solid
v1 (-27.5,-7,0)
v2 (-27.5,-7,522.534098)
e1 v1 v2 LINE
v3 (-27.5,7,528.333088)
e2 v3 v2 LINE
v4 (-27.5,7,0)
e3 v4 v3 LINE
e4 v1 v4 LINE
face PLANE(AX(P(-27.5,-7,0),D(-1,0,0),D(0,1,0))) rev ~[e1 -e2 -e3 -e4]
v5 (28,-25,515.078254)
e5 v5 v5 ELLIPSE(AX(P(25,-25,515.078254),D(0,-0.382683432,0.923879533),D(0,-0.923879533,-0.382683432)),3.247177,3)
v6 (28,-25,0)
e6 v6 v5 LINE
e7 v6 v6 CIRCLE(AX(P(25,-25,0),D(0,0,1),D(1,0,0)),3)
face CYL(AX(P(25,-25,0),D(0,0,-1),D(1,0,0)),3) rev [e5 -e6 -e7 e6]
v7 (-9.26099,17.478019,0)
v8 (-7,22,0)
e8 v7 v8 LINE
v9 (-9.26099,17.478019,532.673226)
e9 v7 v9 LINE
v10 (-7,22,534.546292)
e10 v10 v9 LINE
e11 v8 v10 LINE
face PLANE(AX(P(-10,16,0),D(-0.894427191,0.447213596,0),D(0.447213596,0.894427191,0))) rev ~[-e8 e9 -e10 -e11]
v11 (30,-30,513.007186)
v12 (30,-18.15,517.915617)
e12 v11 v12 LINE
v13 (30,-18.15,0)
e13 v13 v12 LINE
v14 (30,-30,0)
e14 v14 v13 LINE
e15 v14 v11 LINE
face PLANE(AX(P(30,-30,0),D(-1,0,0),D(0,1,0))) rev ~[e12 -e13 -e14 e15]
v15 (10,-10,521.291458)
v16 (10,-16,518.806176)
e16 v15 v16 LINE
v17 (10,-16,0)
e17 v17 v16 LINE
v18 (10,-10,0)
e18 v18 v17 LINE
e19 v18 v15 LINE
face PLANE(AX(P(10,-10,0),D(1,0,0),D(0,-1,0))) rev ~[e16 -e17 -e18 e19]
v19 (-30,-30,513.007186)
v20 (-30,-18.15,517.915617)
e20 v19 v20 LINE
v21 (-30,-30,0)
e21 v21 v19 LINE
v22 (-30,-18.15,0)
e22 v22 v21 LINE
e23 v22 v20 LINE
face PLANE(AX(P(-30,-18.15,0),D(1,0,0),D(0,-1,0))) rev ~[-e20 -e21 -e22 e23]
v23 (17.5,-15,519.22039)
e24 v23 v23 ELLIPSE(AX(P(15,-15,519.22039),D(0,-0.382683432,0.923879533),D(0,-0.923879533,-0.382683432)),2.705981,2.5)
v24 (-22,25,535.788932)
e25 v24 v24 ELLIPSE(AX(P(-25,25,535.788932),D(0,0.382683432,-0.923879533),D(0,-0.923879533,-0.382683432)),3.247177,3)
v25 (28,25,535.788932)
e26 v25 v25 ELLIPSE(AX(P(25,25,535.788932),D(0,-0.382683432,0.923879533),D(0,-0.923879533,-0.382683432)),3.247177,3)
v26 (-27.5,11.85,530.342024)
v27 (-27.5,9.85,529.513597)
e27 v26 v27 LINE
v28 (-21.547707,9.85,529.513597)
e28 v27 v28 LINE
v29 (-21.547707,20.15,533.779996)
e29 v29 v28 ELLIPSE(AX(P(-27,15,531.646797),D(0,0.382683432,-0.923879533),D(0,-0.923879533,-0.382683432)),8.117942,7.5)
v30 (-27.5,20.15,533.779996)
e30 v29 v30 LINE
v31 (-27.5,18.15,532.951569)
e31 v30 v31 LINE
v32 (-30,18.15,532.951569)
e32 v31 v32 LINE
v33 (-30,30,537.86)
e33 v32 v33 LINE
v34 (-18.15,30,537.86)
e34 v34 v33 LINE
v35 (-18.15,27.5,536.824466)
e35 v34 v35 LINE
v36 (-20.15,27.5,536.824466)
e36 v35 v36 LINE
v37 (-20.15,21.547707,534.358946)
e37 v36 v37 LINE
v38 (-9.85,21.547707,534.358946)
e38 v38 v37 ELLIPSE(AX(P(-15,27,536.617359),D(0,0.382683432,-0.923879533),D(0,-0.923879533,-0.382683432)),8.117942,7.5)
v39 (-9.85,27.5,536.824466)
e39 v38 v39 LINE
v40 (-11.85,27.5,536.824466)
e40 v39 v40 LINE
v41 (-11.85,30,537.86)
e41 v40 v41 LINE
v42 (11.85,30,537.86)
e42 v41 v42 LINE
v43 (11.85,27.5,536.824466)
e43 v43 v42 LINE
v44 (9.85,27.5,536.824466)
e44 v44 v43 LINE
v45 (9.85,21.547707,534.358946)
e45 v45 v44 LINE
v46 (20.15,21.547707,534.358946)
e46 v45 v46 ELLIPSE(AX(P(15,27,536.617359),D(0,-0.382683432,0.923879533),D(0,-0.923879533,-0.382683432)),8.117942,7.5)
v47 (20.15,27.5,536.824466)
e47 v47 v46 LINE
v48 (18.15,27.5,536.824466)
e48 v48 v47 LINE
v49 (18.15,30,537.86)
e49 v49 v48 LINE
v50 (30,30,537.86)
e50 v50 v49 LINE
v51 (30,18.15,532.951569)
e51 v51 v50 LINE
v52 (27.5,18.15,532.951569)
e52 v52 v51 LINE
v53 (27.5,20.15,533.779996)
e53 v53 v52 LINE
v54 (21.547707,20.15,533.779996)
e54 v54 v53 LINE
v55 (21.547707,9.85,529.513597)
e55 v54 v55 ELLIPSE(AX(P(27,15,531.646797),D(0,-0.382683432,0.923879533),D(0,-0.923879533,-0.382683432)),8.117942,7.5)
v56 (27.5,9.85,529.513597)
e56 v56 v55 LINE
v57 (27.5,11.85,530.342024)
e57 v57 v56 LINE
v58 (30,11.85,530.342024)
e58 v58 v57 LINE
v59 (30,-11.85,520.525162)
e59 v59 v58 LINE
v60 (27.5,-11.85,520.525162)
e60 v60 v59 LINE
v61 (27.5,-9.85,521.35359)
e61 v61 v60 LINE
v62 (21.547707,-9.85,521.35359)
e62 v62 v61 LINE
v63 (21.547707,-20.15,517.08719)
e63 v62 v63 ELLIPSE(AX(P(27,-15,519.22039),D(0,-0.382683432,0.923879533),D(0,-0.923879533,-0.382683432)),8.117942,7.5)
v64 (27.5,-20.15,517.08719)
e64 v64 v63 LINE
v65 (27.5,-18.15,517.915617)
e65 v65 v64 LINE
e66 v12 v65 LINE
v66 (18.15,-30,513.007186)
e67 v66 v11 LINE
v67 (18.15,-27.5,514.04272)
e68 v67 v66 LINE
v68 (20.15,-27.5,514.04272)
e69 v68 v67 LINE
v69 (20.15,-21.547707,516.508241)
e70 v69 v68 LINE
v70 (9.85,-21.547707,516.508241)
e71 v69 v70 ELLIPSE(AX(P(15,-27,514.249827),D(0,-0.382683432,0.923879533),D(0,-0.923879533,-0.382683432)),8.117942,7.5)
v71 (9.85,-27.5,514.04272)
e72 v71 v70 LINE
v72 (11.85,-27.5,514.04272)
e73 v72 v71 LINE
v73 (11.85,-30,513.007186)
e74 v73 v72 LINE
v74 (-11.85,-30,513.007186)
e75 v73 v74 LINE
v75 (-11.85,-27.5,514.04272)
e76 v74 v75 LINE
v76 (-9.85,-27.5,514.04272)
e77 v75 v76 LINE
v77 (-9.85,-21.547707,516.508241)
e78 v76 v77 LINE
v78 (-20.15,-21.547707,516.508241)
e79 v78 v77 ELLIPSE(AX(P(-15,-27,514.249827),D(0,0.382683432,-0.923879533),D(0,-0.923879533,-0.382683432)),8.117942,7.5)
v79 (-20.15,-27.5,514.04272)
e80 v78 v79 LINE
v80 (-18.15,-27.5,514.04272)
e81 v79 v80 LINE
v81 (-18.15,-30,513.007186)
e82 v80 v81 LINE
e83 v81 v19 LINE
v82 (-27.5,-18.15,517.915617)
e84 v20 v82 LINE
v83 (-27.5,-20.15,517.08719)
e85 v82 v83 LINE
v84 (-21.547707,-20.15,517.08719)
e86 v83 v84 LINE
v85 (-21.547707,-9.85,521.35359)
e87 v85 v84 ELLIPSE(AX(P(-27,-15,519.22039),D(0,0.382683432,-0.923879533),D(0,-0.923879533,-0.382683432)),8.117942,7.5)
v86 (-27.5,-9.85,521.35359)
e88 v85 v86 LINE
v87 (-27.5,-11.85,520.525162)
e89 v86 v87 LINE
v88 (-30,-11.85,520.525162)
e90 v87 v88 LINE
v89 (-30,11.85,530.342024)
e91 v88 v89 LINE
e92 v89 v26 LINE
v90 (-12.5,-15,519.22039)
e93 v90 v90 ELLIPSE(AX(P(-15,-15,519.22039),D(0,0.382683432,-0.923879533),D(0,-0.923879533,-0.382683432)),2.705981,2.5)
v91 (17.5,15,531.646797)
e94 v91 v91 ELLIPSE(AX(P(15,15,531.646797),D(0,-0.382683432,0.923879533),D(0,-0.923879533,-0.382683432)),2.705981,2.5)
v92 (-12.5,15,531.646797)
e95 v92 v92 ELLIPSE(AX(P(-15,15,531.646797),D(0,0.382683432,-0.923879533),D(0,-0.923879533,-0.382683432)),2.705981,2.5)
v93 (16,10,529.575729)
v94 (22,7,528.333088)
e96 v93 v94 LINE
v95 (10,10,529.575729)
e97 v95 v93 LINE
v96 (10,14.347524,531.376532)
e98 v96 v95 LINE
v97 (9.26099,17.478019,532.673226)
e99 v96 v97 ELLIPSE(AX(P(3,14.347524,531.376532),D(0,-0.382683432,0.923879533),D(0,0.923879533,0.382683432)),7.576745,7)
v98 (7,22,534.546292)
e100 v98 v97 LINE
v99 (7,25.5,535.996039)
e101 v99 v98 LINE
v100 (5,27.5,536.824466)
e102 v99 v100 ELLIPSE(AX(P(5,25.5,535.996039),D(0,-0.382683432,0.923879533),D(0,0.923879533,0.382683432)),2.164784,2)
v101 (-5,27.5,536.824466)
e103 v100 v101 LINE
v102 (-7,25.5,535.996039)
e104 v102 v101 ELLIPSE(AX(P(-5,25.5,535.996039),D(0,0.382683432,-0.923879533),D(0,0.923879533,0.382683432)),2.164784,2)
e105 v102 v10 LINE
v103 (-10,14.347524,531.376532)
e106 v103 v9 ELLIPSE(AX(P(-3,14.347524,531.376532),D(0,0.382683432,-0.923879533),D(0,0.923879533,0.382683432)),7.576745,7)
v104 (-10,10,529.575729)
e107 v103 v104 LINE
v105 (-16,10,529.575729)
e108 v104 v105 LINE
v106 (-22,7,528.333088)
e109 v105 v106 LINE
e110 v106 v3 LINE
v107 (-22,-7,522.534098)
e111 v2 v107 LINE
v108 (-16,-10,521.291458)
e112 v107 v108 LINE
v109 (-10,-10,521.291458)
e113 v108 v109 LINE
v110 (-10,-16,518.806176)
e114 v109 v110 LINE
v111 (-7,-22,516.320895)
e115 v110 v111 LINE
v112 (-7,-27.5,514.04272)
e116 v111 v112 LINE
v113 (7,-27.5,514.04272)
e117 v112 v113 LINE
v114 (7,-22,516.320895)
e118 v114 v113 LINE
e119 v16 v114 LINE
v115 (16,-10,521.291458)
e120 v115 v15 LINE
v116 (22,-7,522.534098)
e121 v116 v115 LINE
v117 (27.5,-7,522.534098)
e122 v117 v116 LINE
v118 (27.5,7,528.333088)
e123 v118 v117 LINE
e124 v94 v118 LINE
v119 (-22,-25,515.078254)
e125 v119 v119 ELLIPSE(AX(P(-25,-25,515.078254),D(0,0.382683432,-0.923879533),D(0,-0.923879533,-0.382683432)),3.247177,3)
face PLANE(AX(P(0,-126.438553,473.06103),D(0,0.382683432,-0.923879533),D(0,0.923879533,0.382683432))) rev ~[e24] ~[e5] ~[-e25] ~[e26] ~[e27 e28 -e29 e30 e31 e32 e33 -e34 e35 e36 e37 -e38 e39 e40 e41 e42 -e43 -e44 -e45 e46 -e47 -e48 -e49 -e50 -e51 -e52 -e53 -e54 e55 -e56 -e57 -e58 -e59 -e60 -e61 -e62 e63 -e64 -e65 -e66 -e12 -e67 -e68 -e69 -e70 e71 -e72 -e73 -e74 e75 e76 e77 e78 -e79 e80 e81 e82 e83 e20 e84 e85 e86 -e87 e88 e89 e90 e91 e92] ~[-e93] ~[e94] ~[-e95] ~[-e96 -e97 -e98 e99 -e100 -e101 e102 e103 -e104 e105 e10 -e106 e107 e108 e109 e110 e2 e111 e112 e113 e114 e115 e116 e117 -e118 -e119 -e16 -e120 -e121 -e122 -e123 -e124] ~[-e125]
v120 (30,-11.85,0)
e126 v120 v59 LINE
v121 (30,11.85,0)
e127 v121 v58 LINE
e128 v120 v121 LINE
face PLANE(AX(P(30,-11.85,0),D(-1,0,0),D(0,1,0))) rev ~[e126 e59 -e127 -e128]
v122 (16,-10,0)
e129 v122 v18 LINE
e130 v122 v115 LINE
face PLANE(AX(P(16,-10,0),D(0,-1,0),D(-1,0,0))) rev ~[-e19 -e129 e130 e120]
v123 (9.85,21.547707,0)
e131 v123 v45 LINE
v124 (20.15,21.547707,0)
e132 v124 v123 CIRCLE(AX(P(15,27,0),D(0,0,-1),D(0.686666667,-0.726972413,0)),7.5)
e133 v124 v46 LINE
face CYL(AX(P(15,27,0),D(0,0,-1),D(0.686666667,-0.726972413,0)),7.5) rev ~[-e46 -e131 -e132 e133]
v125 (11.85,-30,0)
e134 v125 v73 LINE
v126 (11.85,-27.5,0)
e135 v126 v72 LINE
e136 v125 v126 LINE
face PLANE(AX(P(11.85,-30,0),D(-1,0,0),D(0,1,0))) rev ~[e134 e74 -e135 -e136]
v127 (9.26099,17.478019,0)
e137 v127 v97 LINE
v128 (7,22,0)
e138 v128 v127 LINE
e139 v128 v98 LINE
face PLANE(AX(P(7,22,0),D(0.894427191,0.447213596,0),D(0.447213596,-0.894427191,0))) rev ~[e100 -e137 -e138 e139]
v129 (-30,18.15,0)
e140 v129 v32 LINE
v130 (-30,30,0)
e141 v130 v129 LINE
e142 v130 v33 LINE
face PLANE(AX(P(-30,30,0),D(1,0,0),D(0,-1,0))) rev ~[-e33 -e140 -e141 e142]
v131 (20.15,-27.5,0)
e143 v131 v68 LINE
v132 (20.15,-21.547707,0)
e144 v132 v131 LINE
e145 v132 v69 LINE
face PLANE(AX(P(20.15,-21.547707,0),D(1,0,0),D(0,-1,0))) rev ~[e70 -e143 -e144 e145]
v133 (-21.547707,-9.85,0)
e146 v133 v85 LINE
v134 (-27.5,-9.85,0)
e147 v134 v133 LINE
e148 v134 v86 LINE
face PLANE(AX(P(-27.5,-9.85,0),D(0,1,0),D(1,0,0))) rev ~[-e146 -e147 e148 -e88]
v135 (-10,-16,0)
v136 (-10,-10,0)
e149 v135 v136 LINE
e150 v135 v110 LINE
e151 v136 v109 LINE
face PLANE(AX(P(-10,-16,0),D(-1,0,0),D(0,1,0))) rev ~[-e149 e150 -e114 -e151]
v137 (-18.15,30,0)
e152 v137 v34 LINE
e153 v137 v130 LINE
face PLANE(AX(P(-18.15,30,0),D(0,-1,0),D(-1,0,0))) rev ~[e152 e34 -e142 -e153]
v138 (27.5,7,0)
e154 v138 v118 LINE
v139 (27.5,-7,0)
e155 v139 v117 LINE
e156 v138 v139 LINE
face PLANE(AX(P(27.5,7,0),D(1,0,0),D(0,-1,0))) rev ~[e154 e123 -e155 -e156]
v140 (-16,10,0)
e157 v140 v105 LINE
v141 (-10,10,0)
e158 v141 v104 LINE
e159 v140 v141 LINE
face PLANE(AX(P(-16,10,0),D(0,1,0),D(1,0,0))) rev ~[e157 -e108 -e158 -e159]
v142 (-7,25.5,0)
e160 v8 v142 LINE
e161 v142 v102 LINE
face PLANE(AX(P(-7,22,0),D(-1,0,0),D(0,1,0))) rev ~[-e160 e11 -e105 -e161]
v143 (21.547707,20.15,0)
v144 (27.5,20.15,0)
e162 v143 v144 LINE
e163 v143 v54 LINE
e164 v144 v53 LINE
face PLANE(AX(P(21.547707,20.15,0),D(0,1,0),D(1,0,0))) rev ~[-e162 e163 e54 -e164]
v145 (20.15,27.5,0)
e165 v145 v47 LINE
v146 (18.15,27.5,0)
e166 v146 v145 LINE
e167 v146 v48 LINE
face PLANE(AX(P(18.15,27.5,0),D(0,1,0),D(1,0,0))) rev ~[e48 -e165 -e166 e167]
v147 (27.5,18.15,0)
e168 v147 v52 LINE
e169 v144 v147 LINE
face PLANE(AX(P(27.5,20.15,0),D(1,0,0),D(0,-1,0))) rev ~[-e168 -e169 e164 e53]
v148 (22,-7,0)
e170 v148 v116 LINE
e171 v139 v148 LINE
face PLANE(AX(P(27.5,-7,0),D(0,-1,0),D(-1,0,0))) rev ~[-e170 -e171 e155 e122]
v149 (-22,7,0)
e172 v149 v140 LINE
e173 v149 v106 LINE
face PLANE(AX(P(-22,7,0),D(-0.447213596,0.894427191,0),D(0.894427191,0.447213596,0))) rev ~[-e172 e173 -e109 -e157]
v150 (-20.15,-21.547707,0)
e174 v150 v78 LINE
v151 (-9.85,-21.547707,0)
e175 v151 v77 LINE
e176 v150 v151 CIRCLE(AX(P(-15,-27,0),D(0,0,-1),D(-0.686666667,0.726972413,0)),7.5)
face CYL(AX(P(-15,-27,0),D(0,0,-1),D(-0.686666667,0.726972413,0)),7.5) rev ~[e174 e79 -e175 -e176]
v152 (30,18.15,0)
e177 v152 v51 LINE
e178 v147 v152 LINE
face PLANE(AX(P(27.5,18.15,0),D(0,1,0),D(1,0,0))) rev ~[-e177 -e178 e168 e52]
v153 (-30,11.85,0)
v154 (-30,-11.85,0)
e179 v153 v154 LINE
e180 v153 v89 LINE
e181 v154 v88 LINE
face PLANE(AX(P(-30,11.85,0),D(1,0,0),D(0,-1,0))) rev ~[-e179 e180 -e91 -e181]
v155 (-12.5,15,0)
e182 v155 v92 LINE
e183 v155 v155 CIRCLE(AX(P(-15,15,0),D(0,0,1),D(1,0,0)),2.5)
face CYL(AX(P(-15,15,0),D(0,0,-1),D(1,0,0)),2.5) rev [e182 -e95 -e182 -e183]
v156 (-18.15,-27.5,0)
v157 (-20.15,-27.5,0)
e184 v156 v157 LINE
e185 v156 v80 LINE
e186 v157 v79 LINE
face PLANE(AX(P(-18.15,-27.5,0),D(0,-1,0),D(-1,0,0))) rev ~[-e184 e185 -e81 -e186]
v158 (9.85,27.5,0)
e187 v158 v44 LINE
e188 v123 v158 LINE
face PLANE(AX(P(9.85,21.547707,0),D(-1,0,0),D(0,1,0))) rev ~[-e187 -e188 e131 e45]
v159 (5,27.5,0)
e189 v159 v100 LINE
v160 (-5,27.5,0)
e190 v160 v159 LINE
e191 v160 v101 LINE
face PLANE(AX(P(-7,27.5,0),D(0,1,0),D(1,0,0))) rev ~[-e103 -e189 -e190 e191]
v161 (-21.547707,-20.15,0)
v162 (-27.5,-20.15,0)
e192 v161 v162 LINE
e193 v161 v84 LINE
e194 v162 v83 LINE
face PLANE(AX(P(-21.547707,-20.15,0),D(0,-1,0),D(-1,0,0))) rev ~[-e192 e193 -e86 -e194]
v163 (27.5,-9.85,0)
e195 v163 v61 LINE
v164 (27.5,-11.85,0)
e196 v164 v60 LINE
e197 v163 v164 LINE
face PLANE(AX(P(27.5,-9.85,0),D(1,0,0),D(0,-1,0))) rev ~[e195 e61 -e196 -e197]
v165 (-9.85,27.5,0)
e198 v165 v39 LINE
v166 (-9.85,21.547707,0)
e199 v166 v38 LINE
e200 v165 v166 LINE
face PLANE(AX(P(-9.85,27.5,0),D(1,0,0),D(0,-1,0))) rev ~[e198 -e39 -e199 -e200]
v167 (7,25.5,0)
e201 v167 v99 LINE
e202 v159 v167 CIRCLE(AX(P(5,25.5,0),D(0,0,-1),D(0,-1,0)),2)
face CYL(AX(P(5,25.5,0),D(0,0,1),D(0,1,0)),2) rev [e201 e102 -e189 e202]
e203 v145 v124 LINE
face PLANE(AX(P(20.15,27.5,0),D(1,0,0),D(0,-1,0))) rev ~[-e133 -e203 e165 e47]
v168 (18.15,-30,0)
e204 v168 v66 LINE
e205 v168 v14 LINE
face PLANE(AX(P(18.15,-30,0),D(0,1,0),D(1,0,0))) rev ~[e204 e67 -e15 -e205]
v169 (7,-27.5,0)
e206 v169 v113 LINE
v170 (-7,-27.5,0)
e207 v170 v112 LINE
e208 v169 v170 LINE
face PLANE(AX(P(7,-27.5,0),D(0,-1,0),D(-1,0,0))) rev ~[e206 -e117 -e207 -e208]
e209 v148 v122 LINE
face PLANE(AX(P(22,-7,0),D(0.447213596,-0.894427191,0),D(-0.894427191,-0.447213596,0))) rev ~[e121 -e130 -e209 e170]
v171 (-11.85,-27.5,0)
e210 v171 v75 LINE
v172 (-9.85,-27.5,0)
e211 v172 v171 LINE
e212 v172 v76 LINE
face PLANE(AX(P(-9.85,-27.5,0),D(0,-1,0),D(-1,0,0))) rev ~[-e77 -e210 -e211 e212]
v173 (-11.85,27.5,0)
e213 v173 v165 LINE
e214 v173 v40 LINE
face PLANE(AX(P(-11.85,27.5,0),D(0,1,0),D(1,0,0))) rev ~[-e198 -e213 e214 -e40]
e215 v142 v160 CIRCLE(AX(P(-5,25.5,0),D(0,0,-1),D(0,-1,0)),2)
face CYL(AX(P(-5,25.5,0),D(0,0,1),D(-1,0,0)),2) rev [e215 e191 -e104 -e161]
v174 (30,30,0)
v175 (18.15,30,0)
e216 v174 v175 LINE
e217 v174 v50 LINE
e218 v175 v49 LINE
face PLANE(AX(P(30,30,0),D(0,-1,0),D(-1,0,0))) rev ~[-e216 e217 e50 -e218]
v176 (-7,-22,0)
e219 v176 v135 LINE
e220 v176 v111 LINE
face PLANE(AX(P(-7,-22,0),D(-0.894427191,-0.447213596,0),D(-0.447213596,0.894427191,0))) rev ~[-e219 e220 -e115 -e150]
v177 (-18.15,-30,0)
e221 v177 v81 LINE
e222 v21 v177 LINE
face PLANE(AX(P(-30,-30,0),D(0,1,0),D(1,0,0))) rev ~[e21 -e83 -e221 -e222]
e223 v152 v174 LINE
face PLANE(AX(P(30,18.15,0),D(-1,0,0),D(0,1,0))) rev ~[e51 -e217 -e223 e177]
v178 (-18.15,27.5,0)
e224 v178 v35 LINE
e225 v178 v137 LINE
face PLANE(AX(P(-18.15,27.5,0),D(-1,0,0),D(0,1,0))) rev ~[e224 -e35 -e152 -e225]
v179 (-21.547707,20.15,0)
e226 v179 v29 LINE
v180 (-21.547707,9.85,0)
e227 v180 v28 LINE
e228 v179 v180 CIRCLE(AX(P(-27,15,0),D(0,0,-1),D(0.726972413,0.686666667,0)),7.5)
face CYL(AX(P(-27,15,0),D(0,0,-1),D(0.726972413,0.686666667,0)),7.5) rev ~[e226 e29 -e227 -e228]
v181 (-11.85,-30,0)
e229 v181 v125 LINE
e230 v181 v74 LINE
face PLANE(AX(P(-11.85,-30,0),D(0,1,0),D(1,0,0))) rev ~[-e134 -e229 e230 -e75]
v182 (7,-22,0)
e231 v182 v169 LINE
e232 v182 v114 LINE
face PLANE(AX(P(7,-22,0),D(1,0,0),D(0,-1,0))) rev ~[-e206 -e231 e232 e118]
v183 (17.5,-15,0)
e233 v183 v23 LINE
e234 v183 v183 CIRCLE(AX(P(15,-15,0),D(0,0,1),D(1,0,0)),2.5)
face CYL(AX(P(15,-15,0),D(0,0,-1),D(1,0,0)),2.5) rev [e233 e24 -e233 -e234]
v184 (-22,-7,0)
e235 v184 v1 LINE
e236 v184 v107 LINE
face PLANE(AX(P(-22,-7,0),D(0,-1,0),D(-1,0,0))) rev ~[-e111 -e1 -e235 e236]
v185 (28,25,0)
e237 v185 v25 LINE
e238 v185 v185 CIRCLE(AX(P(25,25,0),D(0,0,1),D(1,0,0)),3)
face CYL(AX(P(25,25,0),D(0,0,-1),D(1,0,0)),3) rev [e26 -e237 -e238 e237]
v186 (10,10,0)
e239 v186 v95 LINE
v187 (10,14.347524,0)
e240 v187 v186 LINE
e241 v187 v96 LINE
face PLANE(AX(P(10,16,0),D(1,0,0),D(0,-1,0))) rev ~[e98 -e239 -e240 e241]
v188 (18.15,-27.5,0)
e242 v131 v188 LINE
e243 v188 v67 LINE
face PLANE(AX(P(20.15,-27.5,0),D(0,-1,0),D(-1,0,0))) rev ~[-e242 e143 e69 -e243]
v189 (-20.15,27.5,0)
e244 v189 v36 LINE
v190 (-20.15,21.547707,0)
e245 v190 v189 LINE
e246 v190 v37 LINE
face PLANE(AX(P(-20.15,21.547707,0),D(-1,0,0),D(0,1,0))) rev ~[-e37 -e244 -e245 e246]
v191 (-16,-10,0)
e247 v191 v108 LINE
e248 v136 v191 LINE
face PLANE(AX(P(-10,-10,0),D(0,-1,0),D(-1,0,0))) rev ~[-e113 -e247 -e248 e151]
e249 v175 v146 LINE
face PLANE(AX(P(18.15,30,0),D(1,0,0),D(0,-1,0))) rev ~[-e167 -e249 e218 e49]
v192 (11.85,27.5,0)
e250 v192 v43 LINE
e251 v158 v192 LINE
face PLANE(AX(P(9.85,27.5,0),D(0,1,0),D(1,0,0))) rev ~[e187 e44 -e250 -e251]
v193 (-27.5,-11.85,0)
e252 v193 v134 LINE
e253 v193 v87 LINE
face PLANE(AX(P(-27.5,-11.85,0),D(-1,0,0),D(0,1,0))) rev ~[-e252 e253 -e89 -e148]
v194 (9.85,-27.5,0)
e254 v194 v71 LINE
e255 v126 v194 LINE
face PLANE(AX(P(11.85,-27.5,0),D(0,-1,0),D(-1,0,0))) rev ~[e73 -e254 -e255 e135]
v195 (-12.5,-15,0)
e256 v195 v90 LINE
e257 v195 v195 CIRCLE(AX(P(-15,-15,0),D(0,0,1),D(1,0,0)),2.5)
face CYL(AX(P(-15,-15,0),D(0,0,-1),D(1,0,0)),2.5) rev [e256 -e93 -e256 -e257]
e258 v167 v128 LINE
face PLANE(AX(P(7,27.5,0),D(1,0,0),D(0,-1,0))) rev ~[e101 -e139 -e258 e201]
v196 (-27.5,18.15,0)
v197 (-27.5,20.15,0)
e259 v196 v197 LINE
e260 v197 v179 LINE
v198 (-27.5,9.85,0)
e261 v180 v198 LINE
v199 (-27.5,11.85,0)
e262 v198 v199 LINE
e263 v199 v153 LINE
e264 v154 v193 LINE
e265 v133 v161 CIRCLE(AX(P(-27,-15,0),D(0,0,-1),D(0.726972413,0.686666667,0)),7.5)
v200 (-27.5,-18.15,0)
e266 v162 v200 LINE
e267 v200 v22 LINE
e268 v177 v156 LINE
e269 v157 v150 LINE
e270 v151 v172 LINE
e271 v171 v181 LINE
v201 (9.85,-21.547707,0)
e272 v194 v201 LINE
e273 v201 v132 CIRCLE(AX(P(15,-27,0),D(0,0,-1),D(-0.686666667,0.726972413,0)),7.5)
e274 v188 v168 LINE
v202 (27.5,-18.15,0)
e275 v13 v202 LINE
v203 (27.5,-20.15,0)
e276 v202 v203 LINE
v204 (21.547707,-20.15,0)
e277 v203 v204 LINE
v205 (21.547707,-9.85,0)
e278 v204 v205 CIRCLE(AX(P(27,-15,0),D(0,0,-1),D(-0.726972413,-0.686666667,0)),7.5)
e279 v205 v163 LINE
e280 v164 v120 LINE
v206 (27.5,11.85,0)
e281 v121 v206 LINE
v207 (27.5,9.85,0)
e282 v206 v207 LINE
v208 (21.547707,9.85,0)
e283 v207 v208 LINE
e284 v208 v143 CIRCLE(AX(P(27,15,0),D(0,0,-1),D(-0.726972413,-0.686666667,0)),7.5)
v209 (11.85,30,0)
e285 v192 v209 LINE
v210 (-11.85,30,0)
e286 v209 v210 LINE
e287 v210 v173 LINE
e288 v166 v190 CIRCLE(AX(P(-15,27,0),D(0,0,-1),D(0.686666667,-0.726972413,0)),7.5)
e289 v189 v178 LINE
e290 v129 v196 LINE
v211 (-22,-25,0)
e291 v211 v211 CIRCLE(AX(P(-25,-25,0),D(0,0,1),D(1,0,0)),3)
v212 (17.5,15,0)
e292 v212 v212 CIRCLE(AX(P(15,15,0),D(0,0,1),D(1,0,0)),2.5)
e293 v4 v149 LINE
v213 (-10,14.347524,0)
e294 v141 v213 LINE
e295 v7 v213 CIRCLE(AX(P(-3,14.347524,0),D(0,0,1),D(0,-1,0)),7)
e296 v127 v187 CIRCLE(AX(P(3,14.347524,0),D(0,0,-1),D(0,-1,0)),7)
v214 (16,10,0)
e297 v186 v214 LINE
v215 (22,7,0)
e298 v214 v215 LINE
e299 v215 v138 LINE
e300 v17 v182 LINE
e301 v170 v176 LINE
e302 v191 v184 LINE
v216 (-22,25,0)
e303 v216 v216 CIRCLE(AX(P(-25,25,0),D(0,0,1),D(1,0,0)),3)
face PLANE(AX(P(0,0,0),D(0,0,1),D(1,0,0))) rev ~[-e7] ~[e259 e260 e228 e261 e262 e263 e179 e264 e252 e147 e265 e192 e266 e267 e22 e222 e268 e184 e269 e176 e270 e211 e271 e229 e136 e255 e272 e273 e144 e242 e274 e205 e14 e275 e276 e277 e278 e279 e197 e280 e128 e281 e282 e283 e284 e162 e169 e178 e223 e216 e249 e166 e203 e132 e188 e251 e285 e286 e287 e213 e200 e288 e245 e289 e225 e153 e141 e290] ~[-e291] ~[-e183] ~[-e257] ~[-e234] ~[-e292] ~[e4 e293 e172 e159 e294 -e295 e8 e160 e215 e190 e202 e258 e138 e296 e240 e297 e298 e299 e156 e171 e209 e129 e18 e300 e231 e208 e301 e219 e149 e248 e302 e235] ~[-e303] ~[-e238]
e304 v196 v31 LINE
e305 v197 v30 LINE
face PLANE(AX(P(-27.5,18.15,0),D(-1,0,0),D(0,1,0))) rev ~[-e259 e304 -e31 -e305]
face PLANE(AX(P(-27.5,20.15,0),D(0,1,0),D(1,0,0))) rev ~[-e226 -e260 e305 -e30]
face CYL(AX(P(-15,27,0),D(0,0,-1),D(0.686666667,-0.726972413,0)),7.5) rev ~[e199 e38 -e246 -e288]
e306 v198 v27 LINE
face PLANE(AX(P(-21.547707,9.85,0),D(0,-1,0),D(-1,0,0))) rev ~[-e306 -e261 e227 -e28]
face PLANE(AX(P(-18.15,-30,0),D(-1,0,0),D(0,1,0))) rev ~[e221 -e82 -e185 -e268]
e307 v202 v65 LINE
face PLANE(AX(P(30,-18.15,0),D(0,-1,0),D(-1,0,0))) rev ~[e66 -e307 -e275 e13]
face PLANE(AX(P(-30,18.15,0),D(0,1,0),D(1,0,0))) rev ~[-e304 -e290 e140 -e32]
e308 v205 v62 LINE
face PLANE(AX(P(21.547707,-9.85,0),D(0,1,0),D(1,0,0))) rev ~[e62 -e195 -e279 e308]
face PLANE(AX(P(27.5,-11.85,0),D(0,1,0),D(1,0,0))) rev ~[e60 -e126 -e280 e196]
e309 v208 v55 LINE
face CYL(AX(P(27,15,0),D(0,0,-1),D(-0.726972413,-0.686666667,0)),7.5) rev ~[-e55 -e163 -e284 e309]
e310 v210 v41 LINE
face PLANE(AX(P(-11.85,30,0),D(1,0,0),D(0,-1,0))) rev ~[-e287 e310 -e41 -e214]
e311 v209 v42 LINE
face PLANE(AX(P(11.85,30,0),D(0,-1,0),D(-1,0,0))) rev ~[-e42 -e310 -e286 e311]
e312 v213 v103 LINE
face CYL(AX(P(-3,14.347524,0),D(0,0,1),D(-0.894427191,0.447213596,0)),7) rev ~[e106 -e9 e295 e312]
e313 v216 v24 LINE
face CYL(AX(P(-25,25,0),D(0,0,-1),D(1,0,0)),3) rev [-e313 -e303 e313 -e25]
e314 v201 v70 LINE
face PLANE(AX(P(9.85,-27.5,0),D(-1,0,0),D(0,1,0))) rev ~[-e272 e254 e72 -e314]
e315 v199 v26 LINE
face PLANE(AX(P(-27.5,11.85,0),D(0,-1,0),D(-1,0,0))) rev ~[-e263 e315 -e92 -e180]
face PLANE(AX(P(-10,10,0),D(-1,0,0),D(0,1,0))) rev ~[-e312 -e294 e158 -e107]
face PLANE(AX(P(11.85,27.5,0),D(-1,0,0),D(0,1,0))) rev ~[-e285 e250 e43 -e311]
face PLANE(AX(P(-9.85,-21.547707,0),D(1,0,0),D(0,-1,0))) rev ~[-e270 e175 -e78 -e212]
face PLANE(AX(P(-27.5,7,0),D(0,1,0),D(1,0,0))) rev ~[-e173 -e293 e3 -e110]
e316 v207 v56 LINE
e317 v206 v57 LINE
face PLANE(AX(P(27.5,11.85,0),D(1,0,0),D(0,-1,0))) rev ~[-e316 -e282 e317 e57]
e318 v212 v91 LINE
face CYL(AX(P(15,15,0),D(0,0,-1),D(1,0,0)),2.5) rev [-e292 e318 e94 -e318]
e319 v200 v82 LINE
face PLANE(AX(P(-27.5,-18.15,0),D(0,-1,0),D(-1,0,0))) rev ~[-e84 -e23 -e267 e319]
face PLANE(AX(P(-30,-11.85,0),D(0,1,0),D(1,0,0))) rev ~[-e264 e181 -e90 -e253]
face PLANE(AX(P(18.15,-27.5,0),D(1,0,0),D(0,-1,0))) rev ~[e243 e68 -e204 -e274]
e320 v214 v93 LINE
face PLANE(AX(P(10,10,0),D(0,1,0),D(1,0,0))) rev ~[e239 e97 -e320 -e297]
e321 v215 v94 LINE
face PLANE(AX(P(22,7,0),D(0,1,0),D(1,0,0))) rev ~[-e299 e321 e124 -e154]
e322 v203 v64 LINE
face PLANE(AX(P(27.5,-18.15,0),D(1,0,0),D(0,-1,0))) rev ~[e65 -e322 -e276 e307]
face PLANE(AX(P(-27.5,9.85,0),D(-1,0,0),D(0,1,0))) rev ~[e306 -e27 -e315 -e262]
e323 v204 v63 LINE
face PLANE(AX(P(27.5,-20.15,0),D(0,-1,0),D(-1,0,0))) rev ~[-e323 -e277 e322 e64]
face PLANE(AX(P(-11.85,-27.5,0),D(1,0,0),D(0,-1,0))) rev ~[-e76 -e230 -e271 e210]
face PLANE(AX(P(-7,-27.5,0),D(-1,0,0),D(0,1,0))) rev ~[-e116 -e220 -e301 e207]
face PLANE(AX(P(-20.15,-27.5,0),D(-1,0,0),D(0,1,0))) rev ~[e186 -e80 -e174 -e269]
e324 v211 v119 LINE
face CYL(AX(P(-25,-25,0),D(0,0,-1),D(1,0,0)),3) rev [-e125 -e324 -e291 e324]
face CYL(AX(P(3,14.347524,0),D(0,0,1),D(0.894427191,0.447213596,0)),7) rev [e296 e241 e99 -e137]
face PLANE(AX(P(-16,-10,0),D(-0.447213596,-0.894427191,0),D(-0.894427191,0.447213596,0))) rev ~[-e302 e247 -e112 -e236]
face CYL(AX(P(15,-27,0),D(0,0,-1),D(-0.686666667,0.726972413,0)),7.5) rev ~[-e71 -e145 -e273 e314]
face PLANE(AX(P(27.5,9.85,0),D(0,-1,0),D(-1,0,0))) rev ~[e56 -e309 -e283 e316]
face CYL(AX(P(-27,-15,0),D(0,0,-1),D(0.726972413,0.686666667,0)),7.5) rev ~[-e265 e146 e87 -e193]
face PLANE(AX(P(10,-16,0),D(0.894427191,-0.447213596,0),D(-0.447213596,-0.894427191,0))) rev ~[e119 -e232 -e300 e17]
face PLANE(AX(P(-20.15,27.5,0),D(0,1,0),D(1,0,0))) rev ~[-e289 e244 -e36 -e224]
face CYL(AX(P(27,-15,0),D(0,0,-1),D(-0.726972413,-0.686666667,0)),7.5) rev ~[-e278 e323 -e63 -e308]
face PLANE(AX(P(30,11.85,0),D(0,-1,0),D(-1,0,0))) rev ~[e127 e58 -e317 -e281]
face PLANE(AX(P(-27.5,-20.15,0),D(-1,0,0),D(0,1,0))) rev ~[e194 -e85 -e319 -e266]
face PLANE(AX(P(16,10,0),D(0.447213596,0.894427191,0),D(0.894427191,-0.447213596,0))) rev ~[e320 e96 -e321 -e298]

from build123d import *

# Parameters (mm, degrees)
F0_R          = 3
F0_R_2        = 2.5
F1_DEPTH      = 537.86
F2_R          = 2
F3_R          = 7
F5_DEPTH      = 30
F5_DEPTH_BACK = 30


# Not quite as in the source:
# - a feature names something its author has since deleted; it is built from what else it names


with BuildPart() as f1:
    # F0 (on Top) → F1 (new body)
    with BuildSketch(Plane.XY):
        with BuildLine():
            Line((18.15, -30), (30, -30))
            Line((30, -30), (30, -18.15))
            Line((30, -18.15), (27.5, -18.15))
            Line((27.5, -18.15), (27.5, -20.15))
            Line((27.5, -20.15), (21.5477069044, -20.15))
            ThreePointArc((21.5477069044, -20.15), (19.5, -15), (21.5477069044, -9.85))
            Line((21.5477069044, -9.85), (27.5, -9.85))
            Line((27.5, -9.85), (27.5, -11.85))
            Line((27.5, -11.85), (30, -11.85))
            Line((30, -11.85), (30, 11.85))
            Line((30, 11.85), (27.5, 11.85))
            Line((27.5, 11.85), (27.5, 9.85))
            Line((27.5, 9.85), (21.5477069044, 9.85))
            ThreePointArc((21.5477069044, 9.85), (19.5, 15), (21.5477069044, 20.15))
            Line((21.5477069044, 20.15), (27.5, 20.15))
            Line((27.5, 20.15), (27.5, 18.15))
            Line((27.5, 18.15), (30, 18.15))
            Line((30, 18.15), (30, 30))
            Line((30, 30), (18.15, 30))
            Line((18.15, 30), (18.15, 27.5))
            Line((18.15, 27.5), (20.15, 27.5))
            Line((20.15, 27.5), (20.15, 21.5477069044))
            ThreePointArc((20.15, 21.5477069044), (15, 19.5), (9.85, 21.5477069044))
            Line((9.85, 21.5477069044), (9.85, 27.5))
            Line((9.85, 27.5), (11.85, 27.5))
            Line((11.85, 27.5), (11.85, 30))
            Line((11.85, 30), (-11.85, 30))
            Line((-11.85, 30), (-11.85, 27.5))
            Line((-11.85, 27.5), (-9.85, 27.5))
            Line((-9.85, 27.5), (-9.85, 21.5477069044))
            ThreePointArc((-9.85, 21.5477069044), (-15, 19.5), (-20.15, 21.5477069044))
            Line((-20.15, 21.5477069044), (-20.15, 27.5))
            Line((-20.15, 27.5), (-18.15, 27.5))
            Line((-18.15, 27.5), (-18.15, 30))
            Line((-18.15, 30), (-30, 30))
            Line((-30, 30), (-30, 18.15))
            Line((-30, 18.15), (-27.5, 18.15))
            Line((-27.5, 18.15), (-27.5, 20.15))
            Line((-27.5, 20.15), (-21.5477069044, 20.15))
            ThreePointArc((-21.5477069044, 20.15), (-19.5, 15), (-21.5477069044, 9.85))
            Line((-21.5477069044, 9.85), (-27.5, 9.85))
            Line((-27.5, 9.85), (-27.5, 11.85))
            Line((-27.5, 11.85), (-30, 11.85))
            Line((-30, 11.85), (-30, -11.85))
            Line((-30, -11.85), (-27.5, -11.85))
            Line((-27.5, -11.85), (-27.5, -9.85))
            Line((-27.5, -9.85), (-21.5477069044, -9.85))
            ThreePointArc((-21.5477069044, -9.85), (-19.5, -15), (-21.5477069044, -20.15))
            Line((-21.5477069044, -20.15), (-27.5, -20.15))
            Line((-27.5, -20.15), (-27.5, -18.15))
            Line((-27.5, -18.15), (-30, -18.15))
            Line((-30, -18.15), (-30, -30))
            Line((-30, -30), (-18.15, -30))
            Line((-18.15, -30), (-18.15, -27.5))
            Line((-18.15, -27.5), (-20.15, -27.5))
            Line((-20.15, -27.5), (-20.15, -21.5477069044))
            ThreePointArc((-20.15, -21.5477069044), (-15, -19.5), (-9.85, -21.5477069044))
            Line((-9.85, -21.5477069044), (-9.85, -27.5))
            Line((-9.85, -27.5), (-11.85, -27.5))
            Line((-11.85, -27.5), (-11.85, -30))
            Line((-11.85, -30), (11.85, -30))
            Line((11.85, -30), (11.85, -27.5))
            Line((11.85, -27.5), (9.85, -27.5))
            Line((9.85, -27.5), (9.85, -21.5477069044))
            ThreePointArc((9.85, -21.5477069044), (15, -19.5), (20.15, -21.5477069044))
            Line((20.15, -21.5477069044), (20.15, -27.5))
            Line((20.15, -27.5), (18.15, -27.5))
            Line((18.15, -27.5), (18.15, -30))
        make_face()
        with Locations((-25, -25)):
            Circle(F0_R, mode=Mode.SUBTRACT)
        with Locations((-15, -15)):
            Circle(F0_R_2, mode=Mode.SUBTRACT)
        with Locations((25, -25)):
            Circle(F0_R, mode=Mode.SUBTRACT)
        with Locations((15, -15)):
            Circle(F0_R_2, mode=Mode.SUBTRACT)
        with Locations((-25, 25)):
            Circle(F0_R, mode=Mode.SUBTRACT)
        with Locations((-15, 15)):
            Circle(F0_R_2, mode=Mode.SUBTRACT)
        Polygon((-7, 22), (-7, 27.5), (0, 27.5), (7, 27.5), (7, 22), (10, 16), (10, 10), (16, 10), (22, 7), (27.5, 7), (27.5, 0), (27.5, -7), (22, -7), (16, -10), (10, -10), (10, -16), (7, -22), (7, -27.5), (0, -27.5), (-7, -27.5), (-7, -22), (-10, -16), (-10, -10), (-16, -10), (-22, -7), (-27.5, -7), (-27.5, 0), (-27.5, 7), (-22, 7), (-16, 10), (-10, 10), (-10, 16), align=None, mode=Mode.SUBTRACT)
        with Locations((15, 15)):
            Circle(F0_R_2, mode=Mode.SUBTRACT)
        with Locations((25, 25)):
            Circle(F0_R, mode=Mode.SUBTRACT)
    extrude(amount=F1_DEPTH)

    # F2
    f2_edges = [f1.edges().sort_by_distance(p)[0] for p in [
        (-7, 27.5, 268.93),
        (7, 27.5, 268.93),
    ]]
    fillet(f2_edges, radius=F2_R)

    # F3
    f3_edges = [f1.edges().sort_by_distance(p)[0] for p in [
        (-10, 16, 268.93),
        (10, 16, 268.93),
    ]]
    fillet(f3_edges, radius=F3_R)

    # F4 (on Right) → F5 (cut, two sides)
    with BuildSketch(Plane.YZ) as f5_sk:
        Polygon((-77.6874923482, 797.8406045251), (-234.1260457354, 733.041634034), (-126.4385533872, 473.061029509), (30, 537.86), align=None)
    extrude(amount=F5_DEPTH, mode=Mode.SUBTRACT)
    extrude(f5_sk.sketch, amount=-F5_DEPTH_BACK, mode=Mode.SUBTRACT)


solid = f1.part
